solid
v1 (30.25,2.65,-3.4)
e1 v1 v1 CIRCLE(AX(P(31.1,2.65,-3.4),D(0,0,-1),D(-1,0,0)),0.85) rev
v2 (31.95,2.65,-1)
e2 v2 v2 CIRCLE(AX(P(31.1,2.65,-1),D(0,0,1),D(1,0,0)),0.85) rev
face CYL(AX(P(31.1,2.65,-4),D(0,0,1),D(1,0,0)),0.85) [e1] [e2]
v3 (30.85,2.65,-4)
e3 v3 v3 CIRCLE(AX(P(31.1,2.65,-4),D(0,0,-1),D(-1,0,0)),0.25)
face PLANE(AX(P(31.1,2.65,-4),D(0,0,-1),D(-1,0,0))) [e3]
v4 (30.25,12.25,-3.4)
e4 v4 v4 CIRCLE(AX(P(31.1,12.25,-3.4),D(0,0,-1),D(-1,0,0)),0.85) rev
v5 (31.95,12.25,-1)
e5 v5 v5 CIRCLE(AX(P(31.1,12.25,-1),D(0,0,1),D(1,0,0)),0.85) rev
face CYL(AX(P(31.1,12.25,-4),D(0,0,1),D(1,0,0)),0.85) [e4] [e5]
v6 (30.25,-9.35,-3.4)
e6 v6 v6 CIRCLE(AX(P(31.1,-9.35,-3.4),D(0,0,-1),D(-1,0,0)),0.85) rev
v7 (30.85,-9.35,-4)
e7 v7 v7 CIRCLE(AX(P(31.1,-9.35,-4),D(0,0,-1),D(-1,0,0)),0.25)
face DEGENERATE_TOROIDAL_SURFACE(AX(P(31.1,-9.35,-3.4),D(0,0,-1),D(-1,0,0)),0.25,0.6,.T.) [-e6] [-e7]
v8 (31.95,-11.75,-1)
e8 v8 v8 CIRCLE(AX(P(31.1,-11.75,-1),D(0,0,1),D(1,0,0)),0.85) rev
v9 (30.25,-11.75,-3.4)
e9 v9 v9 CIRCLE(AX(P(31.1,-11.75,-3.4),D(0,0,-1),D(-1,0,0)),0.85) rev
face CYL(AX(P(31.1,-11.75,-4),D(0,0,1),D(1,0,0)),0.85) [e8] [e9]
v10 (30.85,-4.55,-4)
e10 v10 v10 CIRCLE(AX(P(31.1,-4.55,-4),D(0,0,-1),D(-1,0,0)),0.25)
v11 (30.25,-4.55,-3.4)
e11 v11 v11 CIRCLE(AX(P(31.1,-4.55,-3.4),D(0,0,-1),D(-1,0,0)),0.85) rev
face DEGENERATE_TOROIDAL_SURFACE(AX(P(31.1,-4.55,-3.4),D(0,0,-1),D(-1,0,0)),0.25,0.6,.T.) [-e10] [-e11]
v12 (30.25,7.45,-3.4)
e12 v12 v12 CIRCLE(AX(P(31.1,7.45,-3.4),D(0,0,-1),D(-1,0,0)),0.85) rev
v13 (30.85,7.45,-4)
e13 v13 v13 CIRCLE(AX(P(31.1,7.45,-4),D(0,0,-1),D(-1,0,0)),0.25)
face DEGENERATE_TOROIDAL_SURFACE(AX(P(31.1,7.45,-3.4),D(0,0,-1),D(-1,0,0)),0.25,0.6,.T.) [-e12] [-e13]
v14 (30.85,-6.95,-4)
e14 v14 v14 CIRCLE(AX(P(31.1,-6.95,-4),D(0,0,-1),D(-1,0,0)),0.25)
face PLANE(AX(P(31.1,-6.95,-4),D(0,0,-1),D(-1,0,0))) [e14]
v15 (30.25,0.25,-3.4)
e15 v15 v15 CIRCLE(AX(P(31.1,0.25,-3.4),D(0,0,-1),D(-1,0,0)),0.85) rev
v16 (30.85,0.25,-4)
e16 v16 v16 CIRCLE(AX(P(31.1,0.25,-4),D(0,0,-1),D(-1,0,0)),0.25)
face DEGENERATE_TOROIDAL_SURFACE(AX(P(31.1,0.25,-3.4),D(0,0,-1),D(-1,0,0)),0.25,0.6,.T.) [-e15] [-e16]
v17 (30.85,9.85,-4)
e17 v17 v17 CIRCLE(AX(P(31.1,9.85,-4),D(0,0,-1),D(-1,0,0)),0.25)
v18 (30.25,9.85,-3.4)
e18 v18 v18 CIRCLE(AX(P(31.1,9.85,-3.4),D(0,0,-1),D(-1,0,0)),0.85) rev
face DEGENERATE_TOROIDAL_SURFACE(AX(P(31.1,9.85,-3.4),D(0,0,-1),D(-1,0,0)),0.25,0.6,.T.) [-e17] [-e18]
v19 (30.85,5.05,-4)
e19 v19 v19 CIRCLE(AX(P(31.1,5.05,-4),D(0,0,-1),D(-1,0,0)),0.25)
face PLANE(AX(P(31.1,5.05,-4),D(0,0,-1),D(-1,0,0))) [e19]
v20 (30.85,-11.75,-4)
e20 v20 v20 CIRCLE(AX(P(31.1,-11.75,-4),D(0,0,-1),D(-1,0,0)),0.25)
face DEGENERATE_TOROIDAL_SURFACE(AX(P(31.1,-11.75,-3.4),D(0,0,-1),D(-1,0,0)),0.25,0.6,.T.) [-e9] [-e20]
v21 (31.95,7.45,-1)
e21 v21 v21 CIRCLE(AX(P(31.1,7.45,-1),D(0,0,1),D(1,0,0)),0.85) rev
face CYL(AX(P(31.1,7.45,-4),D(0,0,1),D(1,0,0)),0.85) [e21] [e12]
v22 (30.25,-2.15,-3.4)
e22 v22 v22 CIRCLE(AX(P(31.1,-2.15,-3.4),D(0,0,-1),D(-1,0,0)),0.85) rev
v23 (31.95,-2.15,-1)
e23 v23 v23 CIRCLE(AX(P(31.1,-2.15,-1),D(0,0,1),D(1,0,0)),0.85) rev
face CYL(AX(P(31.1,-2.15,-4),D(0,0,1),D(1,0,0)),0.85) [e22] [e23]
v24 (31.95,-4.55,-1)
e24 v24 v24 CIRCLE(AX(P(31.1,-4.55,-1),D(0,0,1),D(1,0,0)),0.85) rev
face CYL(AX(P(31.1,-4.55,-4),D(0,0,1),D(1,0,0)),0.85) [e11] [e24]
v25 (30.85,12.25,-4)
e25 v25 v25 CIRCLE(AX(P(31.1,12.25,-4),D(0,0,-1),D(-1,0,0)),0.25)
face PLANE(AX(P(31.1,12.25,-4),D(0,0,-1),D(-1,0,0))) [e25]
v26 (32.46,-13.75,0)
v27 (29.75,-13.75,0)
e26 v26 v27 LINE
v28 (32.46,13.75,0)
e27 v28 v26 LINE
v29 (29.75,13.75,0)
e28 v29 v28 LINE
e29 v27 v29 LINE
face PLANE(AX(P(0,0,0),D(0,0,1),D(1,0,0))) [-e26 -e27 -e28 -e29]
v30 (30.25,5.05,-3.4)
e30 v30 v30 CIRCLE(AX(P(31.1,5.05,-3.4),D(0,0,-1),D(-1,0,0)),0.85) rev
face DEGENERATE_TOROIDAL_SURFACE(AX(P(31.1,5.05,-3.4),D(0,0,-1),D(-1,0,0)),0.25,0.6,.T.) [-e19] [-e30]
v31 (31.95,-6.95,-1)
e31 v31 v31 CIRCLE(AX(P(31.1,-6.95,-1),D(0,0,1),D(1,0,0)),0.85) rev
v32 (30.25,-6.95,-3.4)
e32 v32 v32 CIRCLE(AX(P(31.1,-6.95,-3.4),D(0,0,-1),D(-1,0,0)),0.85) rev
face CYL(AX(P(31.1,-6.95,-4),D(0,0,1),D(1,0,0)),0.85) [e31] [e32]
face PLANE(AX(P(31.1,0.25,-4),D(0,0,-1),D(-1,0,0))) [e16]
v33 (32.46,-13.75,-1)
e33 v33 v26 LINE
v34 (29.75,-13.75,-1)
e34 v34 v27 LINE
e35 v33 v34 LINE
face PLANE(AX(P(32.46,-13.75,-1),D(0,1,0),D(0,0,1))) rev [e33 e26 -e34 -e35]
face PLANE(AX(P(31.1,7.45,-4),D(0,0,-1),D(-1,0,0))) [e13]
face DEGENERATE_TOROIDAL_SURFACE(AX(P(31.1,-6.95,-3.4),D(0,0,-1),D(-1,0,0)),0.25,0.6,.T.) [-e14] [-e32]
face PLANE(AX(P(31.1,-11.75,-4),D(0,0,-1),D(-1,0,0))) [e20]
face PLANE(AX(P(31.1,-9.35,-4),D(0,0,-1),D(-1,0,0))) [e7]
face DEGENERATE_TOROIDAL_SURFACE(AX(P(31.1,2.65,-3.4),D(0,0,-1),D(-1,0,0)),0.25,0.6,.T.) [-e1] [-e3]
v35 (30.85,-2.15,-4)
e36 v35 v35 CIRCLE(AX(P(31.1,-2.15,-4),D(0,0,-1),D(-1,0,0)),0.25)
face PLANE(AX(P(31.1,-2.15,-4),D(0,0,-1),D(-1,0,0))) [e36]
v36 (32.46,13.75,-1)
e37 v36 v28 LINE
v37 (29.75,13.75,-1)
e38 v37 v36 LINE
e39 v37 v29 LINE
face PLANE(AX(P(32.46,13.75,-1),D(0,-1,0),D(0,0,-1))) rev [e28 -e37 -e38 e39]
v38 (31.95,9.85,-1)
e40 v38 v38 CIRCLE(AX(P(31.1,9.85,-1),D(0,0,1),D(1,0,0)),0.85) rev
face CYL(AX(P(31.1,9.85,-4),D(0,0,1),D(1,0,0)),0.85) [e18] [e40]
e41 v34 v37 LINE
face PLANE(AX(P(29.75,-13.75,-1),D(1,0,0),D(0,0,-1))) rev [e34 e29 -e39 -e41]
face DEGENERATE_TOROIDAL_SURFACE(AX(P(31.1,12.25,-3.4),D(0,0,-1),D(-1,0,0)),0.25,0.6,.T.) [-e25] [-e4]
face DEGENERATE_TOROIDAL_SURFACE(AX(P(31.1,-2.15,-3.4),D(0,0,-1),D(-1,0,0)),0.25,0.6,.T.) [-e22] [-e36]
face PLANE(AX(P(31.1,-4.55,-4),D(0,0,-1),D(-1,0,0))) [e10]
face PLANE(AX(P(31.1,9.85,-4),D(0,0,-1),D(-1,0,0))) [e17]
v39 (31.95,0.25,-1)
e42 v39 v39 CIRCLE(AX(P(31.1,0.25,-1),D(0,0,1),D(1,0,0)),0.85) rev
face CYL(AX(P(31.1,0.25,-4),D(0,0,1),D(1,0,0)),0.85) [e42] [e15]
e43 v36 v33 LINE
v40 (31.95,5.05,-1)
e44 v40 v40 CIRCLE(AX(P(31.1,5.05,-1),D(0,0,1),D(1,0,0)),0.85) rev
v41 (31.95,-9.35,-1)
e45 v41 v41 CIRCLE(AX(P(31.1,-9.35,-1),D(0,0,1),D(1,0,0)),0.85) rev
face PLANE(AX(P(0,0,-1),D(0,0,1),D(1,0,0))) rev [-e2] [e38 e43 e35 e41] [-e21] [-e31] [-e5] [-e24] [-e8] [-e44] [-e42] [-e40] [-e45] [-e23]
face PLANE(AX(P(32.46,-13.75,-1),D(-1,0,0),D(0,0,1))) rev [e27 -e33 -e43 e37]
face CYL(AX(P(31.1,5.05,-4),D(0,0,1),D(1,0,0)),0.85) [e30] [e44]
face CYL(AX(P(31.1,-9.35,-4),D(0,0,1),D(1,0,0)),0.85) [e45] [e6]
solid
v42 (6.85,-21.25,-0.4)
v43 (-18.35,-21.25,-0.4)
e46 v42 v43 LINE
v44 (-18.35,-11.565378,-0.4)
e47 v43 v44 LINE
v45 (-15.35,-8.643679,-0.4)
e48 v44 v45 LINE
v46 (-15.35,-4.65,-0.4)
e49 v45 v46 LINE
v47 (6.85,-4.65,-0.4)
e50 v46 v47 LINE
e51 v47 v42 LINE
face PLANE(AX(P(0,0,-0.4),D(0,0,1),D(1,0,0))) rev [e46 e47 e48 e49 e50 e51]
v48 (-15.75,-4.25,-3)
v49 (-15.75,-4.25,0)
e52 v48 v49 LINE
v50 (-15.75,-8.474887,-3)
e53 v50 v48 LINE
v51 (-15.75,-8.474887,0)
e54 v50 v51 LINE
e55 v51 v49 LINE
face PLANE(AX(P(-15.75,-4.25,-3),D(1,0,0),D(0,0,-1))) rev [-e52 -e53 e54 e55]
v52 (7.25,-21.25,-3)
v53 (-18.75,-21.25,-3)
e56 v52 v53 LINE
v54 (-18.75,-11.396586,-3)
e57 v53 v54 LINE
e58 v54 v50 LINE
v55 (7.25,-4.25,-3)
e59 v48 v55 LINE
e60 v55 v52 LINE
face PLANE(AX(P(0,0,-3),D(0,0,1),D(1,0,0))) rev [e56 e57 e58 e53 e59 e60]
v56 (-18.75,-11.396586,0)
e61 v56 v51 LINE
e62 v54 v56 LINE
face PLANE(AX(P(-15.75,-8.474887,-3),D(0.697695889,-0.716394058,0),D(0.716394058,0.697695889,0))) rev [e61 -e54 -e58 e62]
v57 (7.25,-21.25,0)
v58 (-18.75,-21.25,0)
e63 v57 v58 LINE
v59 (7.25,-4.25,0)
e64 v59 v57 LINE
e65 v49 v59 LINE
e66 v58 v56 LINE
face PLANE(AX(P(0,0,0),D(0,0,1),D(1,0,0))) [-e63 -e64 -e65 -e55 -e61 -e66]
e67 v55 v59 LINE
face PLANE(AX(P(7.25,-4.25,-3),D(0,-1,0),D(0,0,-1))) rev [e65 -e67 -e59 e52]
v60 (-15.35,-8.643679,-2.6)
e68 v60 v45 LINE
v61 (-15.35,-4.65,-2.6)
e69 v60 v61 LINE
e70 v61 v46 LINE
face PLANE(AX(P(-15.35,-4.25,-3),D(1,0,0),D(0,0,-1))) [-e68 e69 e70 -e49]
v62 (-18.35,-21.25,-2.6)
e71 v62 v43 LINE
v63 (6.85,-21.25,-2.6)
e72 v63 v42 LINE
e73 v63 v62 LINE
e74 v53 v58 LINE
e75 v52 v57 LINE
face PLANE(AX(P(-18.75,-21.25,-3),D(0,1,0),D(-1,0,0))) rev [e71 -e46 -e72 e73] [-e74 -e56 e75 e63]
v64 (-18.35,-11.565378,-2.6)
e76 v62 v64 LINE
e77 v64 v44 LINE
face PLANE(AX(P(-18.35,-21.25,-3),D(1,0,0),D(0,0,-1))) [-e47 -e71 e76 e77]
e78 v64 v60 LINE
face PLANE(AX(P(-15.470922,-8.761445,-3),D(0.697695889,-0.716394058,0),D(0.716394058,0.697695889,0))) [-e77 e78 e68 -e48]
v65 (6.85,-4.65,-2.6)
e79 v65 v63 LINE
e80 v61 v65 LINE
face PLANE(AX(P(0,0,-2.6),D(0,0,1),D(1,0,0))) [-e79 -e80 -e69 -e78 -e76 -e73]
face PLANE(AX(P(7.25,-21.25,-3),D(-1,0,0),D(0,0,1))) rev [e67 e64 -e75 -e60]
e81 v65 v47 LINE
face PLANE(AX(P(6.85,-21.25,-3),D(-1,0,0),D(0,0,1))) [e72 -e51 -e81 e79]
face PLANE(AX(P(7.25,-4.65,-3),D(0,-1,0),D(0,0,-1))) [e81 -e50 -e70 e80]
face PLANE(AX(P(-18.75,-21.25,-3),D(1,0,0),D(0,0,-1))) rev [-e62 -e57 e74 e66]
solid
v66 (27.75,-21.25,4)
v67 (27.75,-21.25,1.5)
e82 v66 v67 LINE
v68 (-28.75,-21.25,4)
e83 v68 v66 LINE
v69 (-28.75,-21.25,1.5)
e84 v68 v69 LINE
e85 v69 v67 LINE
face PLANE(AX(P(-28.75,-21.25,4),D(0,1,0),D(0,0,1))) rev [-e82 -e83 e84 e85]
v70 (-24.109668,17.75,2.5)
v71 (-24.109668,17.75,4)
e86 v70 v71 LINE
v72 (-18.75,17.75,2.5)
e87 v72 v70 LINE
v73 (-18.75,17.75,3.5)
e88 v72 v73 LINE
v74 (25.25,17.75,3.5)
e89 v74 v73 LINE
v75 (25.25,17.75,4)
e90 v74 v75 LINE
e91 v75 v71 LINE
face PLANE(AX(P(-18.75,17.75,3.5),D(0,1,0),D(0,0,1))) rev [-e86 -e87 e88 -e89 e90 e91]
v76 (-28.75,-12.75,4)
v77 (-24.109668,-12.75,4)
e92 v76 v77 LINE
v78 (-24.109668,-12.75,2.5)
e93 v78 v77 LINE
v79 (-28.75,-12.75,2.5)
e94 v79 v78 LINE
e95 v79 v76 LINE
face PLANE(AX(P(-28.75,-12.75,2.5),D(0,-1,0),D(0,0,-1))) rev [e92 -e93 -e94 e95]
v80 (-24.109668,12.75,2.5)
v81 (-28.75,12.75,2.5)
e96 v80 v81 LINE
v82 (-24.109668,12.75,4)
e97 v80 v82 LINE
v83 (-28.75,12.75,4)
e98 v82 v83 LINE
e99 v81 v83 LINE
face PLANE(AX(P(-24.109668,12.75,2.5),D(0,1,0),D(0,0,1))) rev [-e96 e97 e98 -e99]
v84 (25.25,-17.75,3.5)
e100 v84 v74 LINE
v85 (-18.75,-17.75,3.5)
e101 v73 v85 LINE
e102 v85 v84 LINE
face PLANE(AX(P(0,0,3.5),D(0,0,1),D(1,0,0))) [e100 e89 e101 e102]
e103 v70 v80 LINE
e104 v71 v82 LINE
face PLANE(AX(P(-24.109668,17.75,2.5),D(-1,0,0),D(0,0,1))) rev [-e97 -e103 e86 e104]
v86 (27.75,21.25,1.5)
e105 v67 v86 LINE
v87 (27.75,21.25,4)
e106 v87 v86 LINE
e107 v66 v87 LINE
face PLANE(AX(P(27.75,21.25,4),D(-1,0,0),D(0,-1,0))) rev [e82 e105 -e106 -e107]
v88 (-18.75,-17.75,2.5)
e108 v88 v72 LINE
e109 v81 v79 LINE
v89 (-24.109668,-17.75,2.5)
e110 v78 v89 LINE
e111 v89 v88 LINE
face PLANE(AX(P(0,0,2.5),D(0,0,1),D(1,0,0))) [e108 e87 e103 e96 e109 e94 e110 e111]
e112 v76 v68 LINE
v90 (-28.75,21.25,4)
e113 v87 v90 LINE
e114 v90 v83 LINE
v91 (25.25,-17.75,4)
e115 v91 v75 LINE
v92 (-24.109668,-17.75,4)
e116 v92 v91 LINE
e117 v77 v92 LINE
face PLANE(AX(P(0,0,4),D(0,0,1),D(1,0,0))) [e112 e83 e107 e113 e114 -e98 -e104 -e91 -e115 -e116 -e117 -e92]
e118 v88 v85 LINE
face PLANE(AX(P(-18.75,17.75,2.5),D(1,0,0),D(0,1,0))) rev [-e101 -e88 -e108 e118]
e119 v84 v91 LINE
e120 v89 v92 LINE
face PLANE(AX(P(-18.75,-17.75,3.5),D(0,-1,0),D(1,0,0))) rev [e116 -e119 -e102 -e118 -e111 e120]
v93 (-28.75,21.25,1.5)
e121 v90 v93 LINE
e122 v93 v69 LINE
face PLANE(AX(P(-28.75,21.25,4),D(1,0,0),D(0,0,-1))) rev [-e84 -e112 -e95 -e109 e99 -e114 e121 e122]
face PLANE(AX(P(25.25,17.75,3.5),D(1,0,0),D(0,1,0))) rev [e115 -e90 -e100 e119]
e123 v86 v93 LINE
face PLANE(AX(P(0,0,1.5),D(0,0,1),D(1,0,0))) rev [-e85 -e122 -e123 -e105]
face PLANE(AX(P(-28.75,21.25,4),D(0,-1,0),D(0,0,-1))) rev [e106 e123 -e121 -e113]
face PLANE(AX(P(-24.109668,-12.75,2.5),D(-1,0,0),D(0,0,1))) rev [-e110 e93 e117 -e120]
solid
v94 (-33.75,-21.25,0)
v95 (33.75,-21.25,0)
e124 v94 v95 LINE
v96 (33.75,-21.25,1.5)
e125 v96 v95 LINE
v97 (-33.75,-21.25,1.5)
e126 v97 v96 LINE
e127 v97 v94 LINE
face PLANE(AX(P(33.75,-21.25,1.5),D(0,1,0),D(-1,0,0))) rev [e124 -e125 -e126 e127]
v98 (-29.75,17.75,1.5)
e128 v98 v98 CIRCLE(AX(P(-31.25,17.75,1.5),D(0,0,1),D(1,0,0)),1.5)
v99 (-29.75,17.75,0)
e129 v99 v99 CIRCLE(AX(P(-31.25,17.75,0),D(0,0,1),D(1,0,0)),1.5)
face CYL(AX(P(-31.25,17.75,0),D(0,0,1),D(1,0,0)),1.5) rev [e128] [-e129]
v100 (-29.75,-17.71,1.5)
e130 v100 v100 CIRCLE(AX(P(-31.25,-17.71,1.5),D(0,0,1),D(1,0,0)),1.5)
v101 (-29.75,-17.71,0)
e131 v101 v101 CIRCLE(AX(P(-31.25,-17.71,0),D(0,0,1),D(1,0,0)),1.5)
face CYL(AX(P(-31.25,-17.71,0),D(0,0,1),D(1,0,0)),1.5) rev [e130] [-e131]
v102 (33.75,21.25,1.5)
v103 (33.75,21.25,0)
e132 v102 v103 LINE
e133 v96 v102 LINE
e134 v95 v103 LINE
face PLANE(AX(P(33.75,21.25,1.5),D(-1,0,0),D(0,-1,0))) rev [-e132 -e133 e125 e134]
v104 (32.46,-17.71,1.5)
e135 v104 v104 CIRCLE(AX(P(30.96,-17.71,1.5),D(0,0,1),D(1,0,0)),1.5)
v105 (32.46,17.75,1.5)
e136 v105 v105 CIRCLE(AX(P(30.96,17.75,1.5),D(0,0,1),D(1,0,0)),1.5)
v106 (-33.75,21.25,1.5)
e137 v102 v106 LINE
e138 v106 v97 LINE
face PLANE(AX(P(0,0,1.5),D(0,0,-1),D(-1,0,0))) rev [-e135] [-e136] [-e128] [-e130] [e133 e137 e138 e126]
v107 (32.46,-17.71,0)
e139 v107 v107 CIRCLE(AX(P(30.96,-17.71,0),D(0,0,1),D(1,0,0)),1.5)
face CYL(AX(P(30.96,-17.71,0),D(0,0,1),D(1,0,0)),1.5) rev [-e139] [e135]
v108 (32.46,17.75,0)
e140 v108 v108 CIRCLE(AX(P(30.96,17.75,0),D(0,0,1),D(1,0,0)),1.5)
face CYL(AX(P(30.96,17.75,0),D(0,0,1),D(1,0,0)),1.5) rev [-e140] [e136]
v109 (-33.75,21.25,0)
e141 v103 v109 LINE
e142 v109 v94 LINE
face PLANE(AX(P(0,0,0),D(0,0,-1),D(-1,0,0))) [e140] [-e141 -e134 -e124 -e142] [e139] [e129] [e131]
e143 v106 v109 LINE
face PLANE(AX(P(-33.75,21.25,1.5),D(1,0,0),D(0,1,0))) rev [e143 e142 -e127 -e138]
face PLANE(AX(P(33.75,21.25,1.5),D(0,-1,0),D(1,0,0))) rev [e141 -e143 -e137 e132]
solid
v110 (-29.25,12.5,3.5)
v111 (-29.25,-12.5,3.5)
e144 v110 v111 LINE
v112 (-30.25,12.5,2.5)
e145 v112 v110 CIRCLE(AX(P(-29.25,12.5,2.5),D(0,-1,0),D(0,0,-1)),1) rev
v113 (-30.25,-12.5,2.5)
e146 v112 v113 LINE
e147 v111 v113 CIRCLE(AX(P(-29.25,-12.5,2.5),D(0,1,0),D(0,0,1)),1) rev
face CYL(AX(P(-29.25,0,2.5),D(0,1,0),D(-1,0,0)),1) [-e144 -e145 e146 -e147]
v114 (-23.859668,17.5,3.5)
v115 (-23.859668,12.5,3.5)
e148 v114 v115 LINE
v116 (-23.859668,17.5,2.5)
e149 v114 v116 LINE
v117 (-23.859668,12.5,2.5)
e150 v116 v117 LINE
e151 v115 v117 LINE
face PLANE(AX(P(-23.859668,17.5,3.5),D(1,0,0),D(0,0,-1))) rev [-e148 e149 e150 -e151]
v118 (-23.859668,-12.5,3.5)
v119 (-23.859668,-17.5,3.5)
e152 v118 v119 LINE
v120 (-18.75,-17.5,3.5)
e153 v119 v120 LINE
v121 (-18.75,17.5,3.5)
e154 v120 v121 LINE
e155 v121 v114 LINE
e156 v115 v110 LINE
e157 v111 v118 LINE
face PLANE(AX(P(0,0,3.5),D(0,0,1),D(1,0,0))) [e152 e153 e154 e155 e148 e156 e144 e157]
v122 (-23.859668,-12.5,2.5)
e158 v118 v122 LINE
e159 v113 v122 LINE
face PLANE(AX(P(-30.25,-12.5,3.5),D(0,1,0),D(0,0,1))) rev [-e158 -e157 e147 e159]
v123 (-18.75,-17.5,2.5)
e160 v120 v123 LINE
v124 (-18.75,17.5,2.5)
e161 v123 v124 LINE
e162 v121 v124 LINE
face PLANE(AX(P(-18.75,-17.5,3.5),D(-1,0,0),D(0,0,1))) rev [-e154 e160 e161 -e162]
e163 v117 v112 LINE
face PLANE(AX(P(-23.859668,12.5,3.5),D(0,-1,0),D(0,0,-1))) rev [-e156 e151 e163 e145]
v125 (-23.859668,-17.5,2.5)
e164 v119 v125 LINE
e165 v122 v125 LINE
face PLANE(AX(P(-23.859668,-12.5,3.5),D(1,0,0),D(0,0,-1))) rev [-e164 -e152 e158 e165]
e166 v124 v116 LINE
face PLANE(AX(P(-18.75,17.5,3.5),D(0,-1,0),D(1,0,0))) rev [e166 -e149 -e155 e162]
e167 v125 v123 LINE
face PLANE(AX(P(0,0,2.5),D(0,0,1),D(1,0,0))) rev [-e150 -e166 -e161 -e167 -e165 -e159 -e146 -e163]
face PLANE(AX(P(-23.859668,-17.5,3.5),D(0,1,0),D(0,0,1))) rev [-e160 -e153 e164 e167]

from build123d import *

# Parameters (mm, degrees)
SKETCH2_W           = 67.5
SKETCH2_H           = 42.5
BOSS_EXTRUDE1_DEPTH = 1.5
SKETCH3_R           = 1.5
CUT_EXTRUDE1_DEPTH  = 40.910838127
SKETCH4_W           = 56.5
SKETCH4_H           = 42.5
BOSS_EXTRUDE2_DEPTH = 2.5
SKETCH5_W           = 44
SKETCH5_H           = 35.5
CUT_EXTRUDE2_DEPTH  = 0.5
CUT_EXTRUDE3_DEPTH  = 1.5
BOSS_EXTRUDE3_DEPTH = 1
FILLET1_R           = 1
BOSS_EXTRUDE4_DEPTH = 3
SHELL1_T            = -0.4
SKETCH9_W           = 2.71
SKETCH9_H           = 27.5
BOSS_EXTRUDE5_DEPTH = 1
SKETCH10_R          = 0.85
BOSS_EXTRUDE6_DEPTH = 3
FILLET2_R           = 0.6


with BuildPart() as part:
    # Sketch2 → Boss-Extrude1 (new body)
    with BuildSketch(Plane.XY):
        Rectangle(SKETCH2_W, SKETCH2_H)
    extrude(amount=BOSS_EXTRUDE1_DEPTH)

    # Sketch3 → Cut-Extrude1 (cut, through all)
    with BuildSketch(Plane.XY.offset(1.5)):
        with Locations((-31.25, 17.75)):
            Circle(SKETCH3_R)
        with Locations((30.96, 17.75)):
            Circle(SKETCH3_R)
        with Locations((-31.25, -17.71)):
            Circle(SKETCH3_R)
        with Locations((30.96, -17.71)):
            Circle(SKETCH3_R)
    extrude(amount=-CUT_EXTRUDE1_DEPTH, mode=Mode.SUBTRACT)


with BuildPart() as body_2:
    # Sketch4 → Boss-Extrude2 (new body)
    with BuildSketch(Plane.XY.offset(1.5)):
        with Locations((-0.5, 0)):
            Rectangle(SKETCH4_W, SKETCH4_H)
    extrude(amount=BOSS_EXTRUDE2_DEPTH)

    # Sketch5 → Cut-Extrude2 (cut)
    with BuildSketch(Plane.XY.offset(4)):
        with Locations((3.25, 0)):
            Rectangle(SKETCH5_W, SKETCH5_H)
    extrude(amount=-CUT_EXTRUDE2_DEPTH, mode=Mode.SUBTRACT)

    # Sketch6 → Cut-Extrude3 (cut)
    with BuildSketch(Plane.XY.offset(4)):
        Polygon((-18.75, 17.75), (-24.109667547, 17.75), (-24.109667547, 12.75), (-28.75, 12.75), (-28.75, -12.75), (-24.109667547, -12.75), (-24.109667547, -17.75), (-18.75, -17.75), align=None)
    extrude(amount=-CUT_EXTRUDE3_DEPTH, mode=Mode.SUBTRACT)


with BuildPart() as body_3:
    # Sketch7 → Boss-Extrude3 (new body)
    with BuildSketch(Plane.XY.offset(2.5)):
        Polygon((-18.75, 17.5), (-23.859667547, 17.5), (-23.859667547, 12.5), (-30.25, 12.5), (-30.25, -12.5), (-23.859667547, -12.5), (-23.859667547, -17.5), (-18.75, -17.5), align=None)
    extrude(amount=BOSS_EXTRUDE3_DEPTH)

    # Fillet1
    fillet1_edges = [body_3.edges().sort_by_distance(p)[0] for p in [
        (-30.25, 0, 3.5),
    ]]
    fillet(fillet1_edges, radius=FILLET1_R - 0.0001)  # a hair under: the kernel refuses the full size


with BuildPart() as body_4:
    # Sketch8 → Boss-Extrude4 (new body)
    with BuildSketch(Plane(origin=(0, 0, 0), x_dir=(-1, 0, 0), z_dir=(0, 0, -1))):
        Polygon((18.75, -21.25), (-7.25, -21.25), (-7.25, -4.25), (15.75, -4.25), (15.75, -8.474887062), (18.75, -11.39658587), align=None)
    extrude(amount=BOSS_EXTRUDE4_DEPTH)

    # Shell1
    shell1_openings = [body_4.faces().sort_by_distance(p)[0] for p in [
        (-5.75, -21.25, -1.5),
    ]]
    offset(amount=SHELL1_T, openings=shell1_openings, kind=Kind.INTERSECTION)


with BuildPart() as body_5:
    # Sketch9 → Boss-Extrude5 (new body)
    with BuildSketch(Plane(origin=(0, 0, 0), x_dir=(-1, 0, 0), z_dir=(0, 0, -1))):
        with Locations((-31.105, 0)):
            Rectangle(SKETCH9_W, SKETCH9_H)
    extrude(amount=BOSS_EXTRUDE5_DEPTH)

    # Sketch10 → Boss-Extrude6 (add)
    with BuildSketch(Plane(origin=(0, 0, -1), x_dir=(-1, 0, 0), z_dir=(0, 0, -1))):
        with Locations(Location((-31.1, 12.25, 0), (0, 0, 180))):
            Circle(SKETCH10_R)
        with Locations(Location((-31.1, 9.85, 0), (0, 0, 180))):
            Circle(SKETCH10_R)
        with Locations(Location((-31.1, 7.45, 0), (0, 0, 180))):
            Circle(SKETCH10_R)
        with Locations(Location((-31.1, 5.05, 0), (0, 0, 180))):
            Circle(SKETCH10_R)
        with Locations(Location((-31.1, 2.65, 0), (0, 0, 180))):
            Circle(SKETCH10_R)
        with Locations(Location((-31.1, 0.25, 0), (0, 0, 180))):
            Circle(SKETCH10_R)
        with Locations(Location((-31.1, -2.15, 0), (0, 0, 180))):
            Circle(SKETCH10_R)
        with Locations(Location((-31.1, -4.55, 0), (0, 0, 180))):
            Circle(SKETCH10_R)
        with Locations(Location((-31.1, -6.95, 0), (0, 0, 180))):
            Circle(SKETCH10_R)
        with Locations(Location((-31.1, -9.35, 0), (0, 0, 180))):
            Circle(SKETCH10_R)
        with Locations(Location((-31.1, -11.75, 0), (0, 0, 180))):
            Circle(SKETCH10_R)
    extrude(amount=BOSS_EXTRUDE6_DEPTH)

    # Fillet2
    fillet2_edges = [body_5.edges().sort_by_distance(p)[0] for p in [
        (30.25, 12.25, -4),
        (30.25, 9.85, -4),
        (30.25, 7.45, -4),
        (30.25, 5.05, -4),
        (30.25, 2.65, -4),
        (30.25, 0.25, -4),
        (30.25, -2.15, -4),
        (30.25, -4.55, -4),
        (30.25, -6.95, -4),
        (30.25, -9.35, -4),
        (30.25, -11.75, -4),
    ]]
    fillet(fillet2_edges, radius=FILLET2_R)


solid = Compound([part.part, body_2.part, body_3.part, body_4.part, body_5.part])
